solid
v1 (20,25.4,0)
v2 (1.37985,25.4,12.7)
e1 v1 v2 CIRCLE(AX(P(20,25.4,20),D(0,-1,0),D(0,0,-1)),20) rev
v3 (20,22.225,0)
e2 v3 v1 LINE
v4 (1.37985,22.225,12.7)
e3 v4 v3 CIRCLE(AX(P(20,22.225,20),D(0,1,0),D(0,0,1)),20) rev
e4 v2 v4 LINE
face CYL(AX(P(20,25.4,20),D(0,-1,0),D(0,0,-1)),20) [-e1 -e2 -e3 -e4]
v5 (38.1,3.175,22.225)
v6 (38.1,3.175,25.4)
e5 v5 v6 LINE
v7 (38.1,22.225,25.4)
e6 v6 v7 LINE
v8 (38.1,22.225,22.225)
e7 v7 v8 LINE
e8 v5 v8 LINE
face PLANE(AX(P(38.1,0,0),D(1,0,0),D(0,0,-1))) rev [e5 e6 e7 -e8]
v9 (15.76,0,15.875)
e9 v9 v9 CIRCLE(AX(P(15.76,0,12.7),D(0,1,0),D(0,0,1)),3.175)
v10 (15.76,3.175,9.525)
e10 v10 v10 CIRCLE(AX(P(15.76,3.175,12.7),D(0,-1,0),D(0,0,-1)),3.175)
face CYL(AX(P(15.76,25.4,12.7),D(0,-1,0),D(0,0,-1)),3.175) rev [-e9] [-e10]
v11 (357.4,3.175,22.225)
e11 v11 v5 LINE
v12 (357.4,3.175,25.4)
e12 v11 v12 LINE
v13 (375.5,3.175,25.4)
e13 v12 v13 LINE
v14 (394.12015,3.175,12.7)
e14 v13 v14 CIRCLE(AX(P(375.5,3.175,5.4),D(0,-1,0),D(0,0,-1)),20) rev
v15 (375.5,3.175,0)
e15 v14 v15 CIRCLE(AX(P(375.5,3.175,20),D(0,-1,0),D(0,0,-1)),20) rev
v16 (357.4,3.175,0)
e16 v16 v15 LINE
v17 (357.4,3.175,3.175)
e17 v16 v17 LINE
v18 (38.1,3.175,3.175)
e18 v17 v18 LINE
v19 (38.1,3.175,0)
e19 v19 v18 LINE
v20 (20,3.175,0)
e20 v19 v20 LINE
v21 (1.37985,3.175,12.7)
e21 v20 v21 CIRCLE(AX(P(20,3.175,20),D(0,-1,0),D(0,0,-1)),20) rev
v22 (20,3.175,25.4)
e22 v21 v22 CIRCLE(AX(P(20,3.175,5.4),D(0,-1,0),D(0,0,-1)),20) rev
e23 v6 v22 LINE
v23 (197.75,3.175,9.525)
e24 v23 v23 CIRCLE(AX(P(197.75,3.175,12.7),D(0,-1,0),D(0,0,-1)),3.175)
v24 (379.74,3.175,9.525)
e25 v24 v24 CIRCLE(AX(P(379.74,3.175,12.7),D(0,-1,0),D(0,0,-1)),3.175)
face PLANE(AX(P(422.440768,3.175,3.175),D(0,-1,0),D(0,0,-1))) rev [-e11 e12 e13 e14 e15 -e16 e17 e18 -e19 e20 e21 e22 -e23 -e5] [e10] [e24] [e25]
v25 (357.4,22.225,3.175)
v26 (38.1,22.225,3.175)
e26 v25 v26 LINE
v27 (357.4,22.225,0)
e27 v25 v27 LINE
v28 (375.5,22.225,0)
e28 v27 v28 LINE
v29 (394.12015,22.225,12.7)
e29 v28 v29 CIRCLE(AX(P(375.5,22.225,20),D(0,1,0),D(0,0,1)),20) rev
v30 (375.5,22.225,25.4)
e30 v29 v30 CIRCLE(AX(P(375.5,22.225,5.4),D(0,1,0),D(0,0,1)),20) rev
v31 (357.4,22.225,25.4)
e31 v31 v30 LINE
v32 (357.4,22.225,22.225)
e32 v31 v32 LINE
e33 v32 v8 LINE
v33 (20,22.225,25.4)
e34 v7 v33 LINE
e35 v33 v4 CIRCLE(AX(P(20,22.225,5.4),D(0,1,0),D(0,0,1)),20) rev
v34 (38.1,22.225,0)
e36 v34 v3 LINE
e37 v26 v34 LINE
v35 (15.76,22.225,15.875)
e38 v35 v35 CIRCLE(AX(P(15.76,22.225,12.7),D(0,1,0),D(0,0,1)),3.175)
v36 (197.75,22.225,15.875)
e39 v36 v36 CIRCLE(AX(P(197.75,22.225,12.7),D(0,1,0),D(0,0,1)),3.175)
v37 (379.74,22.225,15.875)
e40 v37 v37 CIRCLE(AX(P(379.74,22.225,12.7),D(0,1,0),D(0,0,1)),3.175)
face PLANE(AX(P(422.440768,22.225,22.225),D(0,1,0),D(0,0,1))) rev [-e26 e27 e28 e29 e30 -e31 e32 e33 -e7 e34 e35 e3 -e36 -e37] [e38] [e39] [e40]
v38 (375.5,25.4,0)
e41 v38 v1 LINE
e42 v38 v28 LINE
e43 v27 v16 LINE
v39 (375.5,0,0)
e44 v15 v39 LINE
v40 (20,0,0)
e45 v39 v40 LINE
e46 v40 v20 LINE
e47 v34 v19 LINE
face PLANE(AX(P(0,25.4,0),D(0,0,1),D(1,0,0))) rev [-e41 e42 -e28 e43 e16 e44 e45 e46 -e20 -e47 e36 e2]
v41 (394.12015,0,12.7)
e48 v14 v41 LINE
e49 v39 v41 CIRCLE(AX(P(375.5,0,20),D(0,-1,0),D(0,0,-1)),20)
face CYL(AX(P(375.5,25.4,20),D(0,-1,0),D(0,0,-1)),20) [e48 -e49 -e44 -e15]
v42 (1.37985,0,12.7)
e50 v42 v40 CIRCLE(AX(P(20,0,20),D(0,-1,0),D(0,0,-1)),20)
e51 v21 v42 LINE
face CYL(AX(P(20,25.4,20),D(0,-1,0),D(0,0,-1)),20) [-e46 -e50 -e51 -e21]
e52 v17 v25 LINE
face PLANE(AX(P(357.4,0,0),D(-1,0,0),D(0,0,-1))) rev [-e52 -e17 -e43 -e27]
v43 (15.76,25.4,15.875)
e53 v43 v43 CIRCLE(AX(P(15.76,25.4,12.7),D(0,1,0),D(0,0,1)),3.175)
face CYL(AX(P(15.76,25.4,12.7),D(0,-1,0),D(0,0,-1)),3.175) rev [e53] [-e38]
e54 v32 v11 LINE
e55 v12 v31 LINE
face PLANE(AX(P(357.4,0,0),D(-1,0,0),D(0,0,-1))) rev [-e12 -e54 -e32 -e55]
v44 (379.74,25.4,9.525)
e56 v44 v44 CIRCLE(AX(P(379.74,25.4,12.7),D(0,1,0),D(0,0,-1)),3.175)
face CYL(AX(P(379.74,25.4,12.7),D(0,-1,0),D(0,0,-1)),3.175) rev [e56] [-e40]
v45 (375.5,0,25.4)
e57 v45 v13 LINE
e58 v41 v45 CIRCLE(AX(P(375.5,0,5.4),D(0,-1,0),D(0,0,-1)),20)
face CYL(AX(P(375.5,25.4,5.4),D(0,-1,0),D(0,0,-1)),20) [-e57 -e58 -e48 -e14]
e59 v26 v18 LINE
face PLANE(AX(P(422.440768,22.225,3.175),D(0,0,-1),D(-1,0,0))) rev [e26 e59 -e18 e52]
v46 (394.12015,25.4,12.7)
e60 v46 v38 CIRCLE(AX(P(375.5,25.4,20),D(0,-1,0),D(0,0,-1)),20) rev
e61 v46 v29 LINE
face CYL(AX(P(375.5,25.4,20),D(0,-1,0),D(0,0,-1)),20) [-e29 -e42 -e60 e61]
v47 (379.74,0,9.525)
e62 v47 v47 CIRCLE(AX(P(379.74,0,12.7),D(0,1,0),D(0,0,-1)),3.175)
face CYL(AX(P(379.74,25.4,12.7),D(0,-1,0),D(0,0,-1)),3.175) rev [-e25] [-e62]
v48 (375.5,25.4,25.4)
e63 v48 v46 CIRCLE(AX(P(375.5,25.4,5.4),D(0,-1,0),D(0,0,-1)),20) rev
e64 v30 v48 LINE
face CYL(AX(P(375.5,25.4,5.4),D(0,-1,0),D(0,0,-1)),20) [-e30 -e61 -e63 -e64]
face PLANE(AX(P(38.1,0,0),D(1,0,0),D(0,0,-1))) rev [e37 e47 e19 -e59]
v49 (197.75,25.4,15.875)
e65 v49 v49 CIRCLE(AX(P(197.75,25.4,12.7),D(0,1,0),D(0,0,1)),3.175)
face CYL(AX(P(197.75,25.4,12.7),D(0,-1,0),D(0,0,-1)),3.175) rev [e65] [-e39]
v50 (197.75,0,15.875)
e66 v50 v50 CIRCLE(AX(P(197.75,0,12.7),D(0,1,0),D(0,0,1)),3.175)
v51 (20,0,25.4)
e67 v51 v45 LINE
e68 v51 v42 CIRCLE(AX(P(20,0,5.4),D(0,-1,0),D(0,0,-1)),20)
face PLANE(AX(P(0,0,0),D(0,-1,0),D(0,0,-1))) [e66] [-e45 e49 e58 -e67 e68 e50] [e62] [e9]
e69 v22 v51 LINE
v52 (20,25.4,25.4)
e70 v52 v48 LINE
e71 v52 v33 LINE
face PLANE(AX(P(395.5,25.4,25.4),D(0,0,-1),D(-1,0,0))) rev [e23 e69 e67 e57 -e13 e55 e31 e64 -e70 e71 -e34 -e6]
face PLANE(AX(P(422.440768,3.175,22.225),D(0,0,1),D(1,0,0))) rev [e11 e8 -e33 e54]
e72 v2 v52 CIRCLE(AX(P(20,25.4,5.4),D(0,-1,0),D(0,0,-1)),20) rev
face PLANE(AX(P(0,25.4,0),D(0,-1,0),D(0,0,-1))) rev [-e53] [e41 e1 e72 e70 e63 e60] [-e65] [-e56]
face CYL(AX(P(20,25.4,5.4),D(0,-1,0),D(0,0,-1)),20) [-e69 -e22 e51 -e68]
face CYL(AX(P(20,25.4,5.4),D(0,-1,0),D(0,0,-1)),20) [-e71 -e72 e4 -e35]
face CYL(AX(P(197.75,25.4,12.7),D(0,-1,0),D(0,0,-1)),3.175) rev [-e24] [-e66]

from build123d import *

# Parameters (mm, degrees)
SKETCH1_W           = 395.5
SKETCH1_H           = 25.4
SKETCH1_R           = 3.175
BOSS_EXTRUDE1_DEPTH = 25.4
CUT_EXTRUDE1_REACH  = 399.128
SKETCH2_W           = 19.05
SKETCH2_H           = 19.05
SKETCH4_W           = 25.4
SKETCH4_H           = 19.05
CUT_EXTRUDE2_DEPTH  = 38.1
FILLET1_R           = 20


with BuildPart() as part:
    # Sketch1 → Boss-Extrude1 (new body)
    with BuildSketch(Plane(origin=(0, 0, 0), x_dir=(1, 0, 0), z_dir=(0, 1, 0))):
        with Locations((197.75, -12.7)):
            Rectangle(SKETCH1_W, SKETCH1_H)
        with Locations(Location((197.75, -12.7, 0), (0, 0, 270))):
            Circle(SKETCH1_R, mode=Mode.SUBTRACT)
        with Locations(Location((15.76, -12.7, 0), (0, 0, 270))):
            Circle(SKETCH1_R, mode=Mode.SUBTRACT)
        with Locations(Location((379.74, -12.7, 0), (0, 0, 90))):
            Circle(SKETCH1_R, mode=Mode.SUBTRACT)
    extrude(amount=BOSS_EXTRUDE1_DEPTH)

    # Cut-Extrude1: up to this face of the body (flat: up to its plane)
    cut_extrude1_end = Plane(part.part.faces().sort_by_distance((395.5, 12.7, 12.7))[0])
    # Sketch2 → Cut-Extrude1 (cut, up to the picked face)
    with BuildSketch(Plane.ZY, mode=Mode.PRIVATE) as cut_extrude1_sk1:
        with Locations((12.7, 12.7)):
            Rectangle(SKETCH2_W, SKETCH2_H)
    cut_extrude1_tool1 = split(extrude(cut_extrude1_sk1.sketch, amount=-CUT_EXTRUDE1_REACH, mode=Mode.PRIVATE), bisect_by=cut_extrude1_end, keep=Keep.BOTH, mode=Mode.PRIVATE)
    add(cut_extrude1_tool1.solids().sort_by(Axis((0, 12.7, 12.7), (1, 0, 0)))[0], mode=Mode.SUBTRACT)

    # Sketch4 → Cut-Extrude2 (cut)
    with BuildSketch(Plane.ZY):
        with Locations((12.7, 12.7)):
            Rectangle(SKETCH4_W, SKETCH4_H)
    cut_extrude2 = extrude(amount=-CUT_EXTRUDE2_DEPTH, mode=Mode.SUBTRACT)

    # Mirror1: Cut-Extrude2 across plane
    add(cut_extrude2.mirror(Plane.ZY.offset(-197.75)), mode=Mode.SUBTRACT)

    # Fillet1
    # the kernel refuses this fillet: 20 mm, written as the material it takes off along each edge
    with BuildSketch(Plane(origin=(395.5, -50, 0), x_dir=(-1, 0, 0), z_dir=(0, 1, 0)), Plane(origin=(395.5, -27.775, 0), x_dir=(-1, 0, 0), z_dir=(0, 1, 0)), Plane(origin=(0, -27.775, 25.4), x_dir=(1, 0, 0), z_dir=(0, 1, 0))) as fillet1_piece_1:
        with BuildLine():
            CenterArc((FILLET1_R, FILLET1_R), FILLET1_R, 180, 90)
            Line((0, FILLET1_R), (0, 0))
            Line((0, 0), (FILLET1_R, 0))
        make_face()
    extrude(amount=103.175, mode=Mode.SUBTRACT)
    with BuildSketch(Plane(origin=(395.5, -50, 25.4), x_dir=(-1, 0, 0), z_dir=(0, 1, 0)), Plane(origin=(395.5, -27.775, 25.4), x_dir=(-1, 0, 0), z_dir=(0, 1, 0)), Plane(origin=(0, -50, 25.4), x_dir=(0, 0, -1), z_dir=(0, 1, 0)), Plane(origin=(0, -50, 0), x_dir=(1, 0, 0), z_dir=(0, 1, 0)), Plane(origin=(0, -27.775, 0), x_dir=(1, 0, 0), z_dir=(0, 1, 0))) as fillet1_piece_2:
        with BuildLine():
            CenterArc((FILLET1_R, -FILLET1_R), FILLET1_R, 90, 90)
            Line((0, -FILLET1_R), (0, 0))
            Line((0, 0), (FILLET1_R, 0))
        make_face()
    extrude(amount=103.175, mode=Mode.SUBTRACT)


solid = part.part
